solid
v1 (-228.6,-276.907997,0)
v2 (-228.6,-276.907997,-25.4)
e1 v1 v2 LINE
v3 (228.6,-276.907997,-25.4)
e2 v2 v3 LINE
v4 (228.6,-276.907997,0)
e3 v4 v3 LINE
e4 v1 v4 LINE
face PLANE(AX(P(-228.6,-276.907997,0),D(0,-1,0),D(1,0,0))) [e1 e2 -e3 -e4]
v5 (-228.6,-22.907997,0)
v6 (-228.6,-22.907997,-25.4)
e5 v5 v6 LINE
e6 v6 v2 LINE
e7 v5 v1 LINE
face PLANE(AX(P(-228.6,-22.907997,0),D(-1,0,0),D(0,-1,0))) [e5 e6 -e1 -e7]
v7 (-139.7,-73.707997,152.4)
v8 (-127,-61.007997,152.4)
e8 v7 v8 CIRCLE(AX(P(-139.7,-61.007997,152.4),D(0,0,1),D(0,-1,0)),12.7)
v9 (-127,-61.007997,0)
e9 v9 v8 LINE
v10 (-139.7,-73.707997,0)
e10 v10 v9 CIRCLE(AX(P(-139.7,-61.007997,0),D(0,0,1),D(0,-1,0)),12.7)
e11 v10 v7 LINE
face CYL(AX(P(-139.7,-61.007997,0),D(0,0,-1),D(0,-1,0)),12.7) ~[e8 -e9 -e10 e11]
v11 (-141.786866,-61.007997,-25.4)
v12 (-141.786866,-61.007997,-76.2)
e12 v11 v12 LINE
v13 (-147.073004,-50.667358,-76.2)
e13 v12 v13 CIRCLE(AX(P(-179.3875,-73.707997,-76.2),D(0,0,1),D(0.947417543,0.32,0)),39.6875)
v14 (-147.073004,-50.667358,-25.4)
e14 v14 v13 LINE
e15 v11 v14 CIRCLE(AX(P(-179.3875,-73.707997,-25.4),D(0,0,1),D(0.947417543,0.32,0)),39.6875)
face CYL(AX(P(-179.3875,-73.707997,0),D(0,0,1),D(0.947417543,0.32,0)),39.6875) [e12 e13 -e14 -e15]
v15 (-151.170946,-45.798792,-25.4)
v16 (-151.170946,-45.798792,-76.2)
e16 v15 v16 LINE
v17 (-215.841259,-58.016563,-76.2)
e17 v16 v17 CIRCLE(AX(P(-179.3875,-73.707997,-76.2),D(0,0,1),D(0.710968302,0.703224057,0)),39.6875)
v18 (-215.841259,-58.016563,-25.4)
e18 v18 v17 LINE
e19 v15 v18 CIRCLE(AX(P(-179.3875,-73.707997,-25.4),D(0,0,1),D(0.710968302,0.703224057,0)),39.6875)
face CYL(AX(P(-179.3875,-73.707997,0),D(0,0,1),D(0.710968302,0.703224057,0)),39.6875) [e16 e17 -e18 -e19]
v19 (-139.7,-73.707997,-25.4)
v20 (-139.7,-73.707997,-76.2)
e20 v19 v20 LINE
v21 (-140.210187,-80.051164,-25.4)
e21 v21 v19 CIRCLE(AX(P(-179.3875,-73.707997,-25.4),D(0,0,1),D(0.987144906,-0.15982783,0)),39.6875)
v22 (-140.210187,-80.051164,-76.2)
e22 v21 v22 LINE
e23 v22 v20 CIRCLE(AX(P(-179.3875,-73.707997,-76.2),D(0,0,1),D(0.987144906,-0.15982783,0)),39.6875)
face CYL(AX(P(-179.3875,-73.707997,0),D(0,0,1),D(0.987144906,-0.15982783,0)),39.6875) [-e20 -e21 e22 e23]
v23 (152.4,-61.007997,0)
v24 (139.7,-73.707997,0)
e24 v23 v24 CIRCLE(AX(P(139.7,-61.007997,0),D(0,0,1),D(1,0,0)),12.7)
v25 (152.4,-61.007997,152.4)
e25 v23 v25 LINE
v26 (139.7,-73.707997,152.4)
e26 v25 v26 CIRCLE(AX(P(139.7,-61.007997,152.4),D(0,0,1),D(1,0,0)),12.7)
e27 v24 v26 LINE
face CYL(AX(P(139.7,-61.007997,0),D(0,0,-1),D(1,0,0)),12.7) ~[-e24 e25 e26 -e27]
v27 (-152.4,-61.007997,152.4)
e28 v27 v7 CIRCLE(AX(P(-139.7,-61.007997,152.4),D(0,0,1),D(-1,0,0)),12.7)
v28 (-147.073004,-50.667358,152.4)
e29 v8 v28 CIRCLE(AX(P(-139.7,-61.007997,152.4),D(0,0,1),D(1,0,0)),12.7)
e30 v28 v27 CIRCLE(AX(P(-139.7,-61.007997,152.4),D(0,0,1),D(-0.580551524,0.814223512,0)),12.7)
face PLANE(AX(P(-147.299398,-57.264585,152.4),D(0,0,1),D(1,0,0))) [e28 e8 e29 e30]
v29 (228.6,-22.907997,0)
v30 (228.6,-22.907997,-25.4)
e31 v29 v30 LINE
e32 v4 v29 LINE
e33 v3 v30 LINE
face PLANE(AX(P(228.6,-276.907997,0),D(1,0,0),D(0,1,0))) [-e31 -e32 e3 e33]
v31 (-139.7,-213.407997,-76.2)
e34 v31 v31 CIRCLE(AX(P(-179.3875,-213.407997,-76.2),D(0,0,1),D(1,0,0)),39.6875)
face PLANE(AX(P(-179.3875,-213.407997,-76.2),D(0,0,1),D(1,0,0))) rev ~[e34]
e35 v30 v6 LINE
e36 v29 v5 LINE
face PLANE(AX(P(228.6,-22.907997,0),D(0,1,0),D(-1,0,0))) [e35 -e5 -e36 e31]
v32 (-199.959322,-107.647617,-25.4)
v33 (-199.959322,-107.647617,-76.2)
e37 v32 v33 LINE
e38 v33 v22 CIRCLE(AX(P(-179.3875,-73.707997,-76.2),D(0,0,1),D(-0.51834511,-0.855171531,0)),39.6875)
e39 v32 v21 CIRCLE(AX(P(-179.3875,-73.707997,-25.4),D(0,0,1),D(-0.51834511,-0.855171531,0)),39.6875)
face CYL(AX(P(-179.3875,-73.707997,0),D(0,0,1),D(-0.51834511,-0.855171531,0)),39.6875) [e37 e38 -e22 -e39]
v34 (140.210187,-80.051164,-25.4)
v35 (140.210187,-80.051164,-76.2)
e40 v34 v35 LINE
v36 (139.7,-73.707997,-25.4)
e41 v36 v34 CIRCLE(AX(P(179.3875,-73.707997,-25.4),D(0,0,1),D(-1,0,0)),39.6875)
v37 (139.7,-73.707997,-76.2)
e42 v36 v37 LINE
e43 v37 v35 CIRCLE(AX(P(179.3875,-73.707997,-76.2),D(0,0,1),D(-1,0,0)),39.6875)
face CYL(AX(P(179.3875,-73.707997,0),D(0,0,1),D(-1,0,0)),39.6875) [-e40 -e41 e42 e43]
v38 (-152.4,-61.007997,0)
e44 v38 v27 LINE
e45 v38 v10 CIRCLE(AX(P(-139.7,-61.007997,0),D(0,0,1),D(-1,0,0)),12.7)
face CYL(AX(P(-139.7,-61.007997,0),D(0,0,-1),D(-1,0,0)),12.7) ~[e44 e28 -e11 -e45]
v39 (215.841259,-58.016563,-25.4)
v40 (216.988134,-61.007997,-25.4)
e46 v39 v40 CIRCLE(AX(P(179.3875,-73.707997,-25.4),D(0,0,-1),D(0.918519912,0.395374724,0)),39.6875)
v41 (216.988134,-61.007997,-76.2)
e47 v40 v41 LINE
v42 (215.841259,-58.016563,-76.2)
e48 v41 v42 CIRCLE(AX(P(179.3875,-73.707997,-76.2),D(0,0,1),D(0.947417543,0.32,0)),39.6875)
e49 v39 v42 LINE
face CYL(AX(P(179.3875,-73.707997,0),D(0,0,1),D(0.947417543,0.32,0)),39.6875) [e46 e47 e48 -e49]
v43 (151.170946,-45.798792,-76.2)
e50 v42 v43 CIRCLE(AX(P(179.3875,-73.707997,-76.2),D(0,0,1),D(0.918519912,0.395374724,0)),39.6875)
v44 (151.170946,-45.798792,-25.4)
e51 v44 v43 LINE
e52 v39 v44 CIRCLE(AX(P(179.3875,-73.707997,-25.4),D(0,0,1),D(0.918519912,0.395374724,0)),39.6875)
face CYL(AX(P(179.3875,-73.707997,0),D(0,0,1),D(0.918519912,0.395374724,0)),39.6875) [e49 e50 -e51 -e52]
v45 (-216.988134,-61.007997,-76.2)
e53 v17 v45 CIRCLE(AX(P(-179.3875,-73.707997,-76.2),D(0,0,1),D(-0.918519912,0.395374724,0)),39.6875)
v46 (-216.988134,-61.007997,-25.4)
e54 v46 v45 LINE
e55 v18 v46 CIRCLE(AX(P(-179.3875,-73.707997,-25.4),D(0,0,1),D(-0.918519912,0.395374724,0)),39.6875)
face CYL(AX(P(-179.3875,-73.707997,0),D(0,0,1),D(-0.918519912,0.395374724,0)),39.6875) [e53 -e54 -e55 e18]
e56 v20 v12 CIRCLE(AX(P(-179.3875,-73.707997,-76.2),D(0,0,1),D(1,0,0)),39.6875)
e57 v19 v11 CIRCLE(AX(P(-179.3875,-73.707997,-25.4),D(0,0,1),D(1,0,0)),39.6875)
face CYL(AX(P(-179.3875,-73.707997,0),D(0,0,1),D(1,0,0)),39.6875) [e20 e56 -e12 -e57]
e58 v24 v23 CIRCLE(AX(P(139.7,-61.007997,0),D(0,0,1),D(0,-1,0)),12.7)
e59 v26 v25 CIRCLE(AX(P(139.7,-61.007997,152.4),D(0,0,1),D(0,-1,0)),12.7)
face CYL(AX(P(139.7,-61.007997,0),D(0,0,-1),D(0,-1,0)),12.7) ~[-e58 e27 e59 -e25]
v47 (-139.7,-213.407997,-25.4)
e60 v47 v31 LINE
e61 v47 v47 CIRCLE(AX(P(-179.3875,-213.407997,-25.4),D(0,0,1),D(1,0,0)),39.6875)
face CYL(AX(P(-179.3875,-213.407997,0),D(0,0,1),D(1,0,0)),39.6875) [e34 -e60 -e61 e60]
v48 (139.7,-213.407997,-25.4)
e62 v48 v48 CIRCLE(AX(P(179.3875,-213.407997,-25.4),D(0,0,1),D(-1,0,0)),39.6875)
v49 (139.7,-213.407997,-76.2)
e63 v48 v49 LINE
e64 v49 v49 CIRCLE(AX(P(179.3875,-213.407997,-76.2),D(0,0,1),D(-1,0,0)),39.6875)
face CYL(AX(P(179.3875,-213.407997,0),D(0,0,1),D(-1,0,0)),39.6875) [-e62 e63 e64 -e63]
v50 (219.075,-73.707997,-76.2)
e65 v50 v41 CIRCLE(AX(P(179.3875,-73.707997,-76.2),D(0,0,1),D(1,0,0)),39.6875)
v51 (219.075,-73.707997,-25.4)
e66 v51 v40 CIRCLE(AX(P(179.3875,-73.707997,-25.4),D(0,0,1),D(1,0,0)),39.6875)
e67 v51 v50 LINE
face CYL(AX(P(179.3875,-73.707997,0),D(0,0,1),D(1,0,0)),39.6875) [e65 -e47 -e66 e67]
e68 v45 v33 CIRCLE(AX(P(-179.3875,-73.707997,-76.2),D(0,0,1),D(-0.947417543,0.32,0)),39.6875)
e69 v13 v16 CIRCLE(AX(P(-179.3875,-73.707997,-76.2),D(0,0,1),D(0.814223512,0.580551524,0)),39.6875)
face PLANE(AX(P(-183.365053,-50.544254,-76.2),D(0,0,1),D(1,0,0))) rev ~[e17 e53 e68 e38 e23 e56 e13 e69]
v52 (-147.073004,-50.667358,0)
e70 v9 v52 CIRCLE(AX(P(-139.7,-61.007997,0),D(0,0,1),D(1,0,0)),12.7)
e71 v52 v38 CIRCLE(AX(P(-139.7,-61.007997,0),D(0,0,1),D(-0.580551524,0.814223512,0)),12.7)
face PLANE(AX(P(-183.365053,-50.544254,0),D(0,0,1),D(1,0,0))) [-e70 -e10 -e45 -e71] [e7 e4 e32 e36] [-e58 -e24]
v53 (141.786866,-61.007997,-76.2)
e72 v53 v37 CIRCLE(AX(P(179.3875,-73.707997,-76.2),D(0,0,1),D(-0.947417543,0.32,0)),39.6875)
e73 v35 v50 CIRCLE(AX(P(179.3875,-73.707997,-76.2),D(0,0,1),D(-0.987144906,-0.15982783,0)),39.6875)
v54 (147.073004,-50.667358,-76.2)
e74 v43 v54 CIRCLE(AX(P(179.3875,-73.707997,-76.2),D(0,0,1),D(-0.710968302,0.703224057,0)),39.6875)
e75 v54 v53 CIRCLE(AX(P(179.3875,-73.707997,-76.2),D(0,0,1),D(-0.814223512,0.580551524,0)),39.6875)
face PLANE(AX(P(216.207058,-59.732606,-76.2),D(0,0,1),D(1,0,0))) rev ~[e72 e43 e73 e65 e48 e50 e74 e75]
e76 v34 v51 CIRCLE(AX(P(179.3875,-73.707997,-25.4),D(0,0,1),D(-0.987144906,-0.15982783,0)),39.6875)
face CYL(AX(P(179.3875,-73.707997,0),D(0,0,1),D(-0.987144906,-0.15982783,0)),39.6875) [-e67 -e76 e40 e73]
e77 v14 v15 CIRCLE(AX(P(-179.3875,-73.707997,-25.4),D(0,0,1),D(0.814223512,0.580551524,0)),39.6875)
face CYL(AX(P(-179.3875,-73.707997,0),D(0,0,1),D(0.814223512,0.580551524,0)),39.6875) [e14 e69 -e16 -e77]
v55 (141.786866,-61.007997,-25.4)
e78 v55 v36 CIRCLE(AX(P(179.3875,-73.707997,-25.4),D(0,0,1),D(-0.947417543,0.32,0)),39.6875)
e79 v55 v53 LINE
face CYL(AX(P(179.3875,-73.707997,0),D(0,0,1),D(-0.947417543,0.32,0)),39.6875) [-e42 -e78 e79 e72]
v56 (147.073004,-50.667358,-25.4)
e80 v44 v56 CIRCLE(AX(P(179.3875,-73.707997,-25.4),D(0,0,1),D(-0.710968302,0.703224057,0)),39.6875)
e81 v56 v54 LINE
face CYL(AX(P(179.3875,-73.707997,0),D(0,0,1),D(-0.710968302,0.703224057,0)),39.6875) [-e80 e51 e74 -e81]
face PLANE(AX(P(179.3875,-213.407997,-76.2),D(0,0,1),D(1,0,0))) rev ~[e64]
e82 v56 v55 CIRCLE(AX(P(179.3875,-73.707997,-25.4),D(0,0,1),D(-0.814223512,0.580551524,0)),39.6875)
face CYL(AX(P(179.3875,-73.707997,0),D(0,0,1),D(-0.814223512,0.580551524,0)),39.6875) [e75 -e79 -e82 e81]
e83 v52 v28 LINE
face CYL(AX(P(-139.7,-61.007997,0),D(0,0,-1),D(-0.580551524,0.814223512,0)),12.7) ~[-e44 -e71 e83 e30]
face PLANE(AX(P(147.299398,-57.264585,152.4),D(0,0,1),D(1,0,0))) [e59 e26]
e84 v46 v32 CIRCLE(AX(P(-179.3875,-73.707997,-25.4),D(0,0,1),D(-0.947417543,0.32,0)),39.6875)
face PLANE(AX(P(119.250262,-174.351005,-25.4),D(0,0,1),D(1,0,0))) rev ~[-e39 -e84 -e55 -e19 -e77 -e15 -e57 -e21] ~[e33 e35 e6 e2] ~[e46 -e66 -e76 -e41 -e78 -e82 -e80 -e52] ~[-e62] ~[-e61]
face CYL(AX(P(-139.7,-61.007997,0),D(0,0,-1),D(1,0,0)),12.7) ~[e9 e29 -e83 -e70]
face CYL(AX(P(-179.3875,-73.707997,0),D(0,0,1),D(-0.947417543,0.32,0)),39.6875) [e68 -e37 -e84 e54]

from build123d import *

# Parameters (mm, degrees)
F0_R     = 39.6875
F1_DEPTH = 25.4
F2_DEPTH = 76.2
F3_DEPTH = 152.4


with BuildPart() as f1:
    # F0 (on Top) → F1 (new body)
    with BuildSketch(Plane.XY):
        with BuildLine():
            Line((64.5657867546, -73.7079969396), (0, -73.7079969396))
            Line((0, -73.7079969396), (0, -213.4079969396))
            Line((0, -213.4079969396), (0, -276.9079969396))
            Line((0, -276.9079969396), (228.6, -276.9079969396))
            Line((228.6, -276.9079969396), (228.6, -61.0079969396))
            Line((228.6, -61.0079969396), (216.9881337214, -61.0079969396))
            ThreePointArc((216.9881337214, -61.0079969396), (218.5498084551, -67.2728393878), (219.075, -73.7079969396))
            ThreePointArc((219.075, -73.7079969396), (213.9674206511, -93.1843093218), (199.9593215616, -107.6476170595))
            ThreePointArc((199.9593215616, -107.6476170595), (121.1719117521, -134.9211212537), (64.5657867546, -73.7079969396))
        make_face()
        with BuildLine():
            ThreePointArc((219.075, -213.4079969396), (179.3875, -253.0954969396), (139.7, -213.4079969396))
            ThreePointArc((139.7, -213.4079969396), (179.3875, -173.7204969396), (219.075, -213.4079969396))
        make_face(mode=Mode.SUBTRACT)
        with BuildLine():
            Line((0, -213.4079969396), (0, -73.7079969396))
            Line((0, -73.7079969396), (-64.5657867546, -73.7079969396))
            ThreePointArc((-64.5657867546, -73.7079969396), (-121.1719117521, -134.9211212537), (-199.9593215616, -107.6476170595))
            ThreePointArc((-199.9593215616, -107.6476170595), (-216.6678189317, -87.3195904026), (-216.9881337214, -61.0079969396))
            Line((-216.9881337214, -61.0079969396), (-228.6, -61.0079969396))
            Line((-228.6, -61.0079969396), (-228.6, -276.9079969396))
            Line((-228.6, -276.9079969396), (0, -276.9079969396))
            Line((0, -276.9079969396), (0, -213.4079969396))
        make_face()
        with Locations((-179.3875, -213.4079969396)):
            Circle(F0_R, mode=Mode.SUBTRACT)
        with BuildLine():
            ThreePointArc((219.075, -213.4079969396), (179.3875, -173.7204969396), (139.7, -213.4079969396))
            ThreePointArc((139.7, -213.4079969396), (179.3875, -253.0954969396), (219.075, -213.4079969396))
        make_face()
        with Locations((-179.3875, -213.4079969396)):
            Circle(F0_R)
        with BuildLine():
            ThreePointArc((-199.9593215616, -107.6476170595), (-121.1719117521, -134.9211212537), (-64.5657867546, -73.7079969396))
            Line((-64.5657867546, -73.7079969396), (-125.5009683429, -73.7079969396))
            ThreePointArc((-125.5009683429, -73.7079969396), (-132.1564556102, -78.5007793952), (-140.2101865576, -80.0511639471))
            ThreePointArc((-140.2101865576, -80.0511639471), (-162.7462218601, -109.7380610267), (-199.9593215616, -107.6476170595))
        make_face()
        with BuildLine():
            Line((125.5009683429, -73.7079969396), (64.5657867546, -73.7079969396))
            ThreePointArc((64.5657867546, -73.7079969396), (121.1719117521, -134.9211212537), (199.9593215616, -107.6476170595))
            ThreePointArc((199.9593215616, -107.6476170595), (162.7462218601, -109.7380610267), (140.2101865576, -80.0511639471))
            ThreePointArc((140.2101865576, -80.0511639471), (132.1564556102, -78.5007793952), (125.5009683429, -73.7079969396))
        make_face()
        with BuildLine():
            Line((-158.75, -61.0079969396), (-215.9, -61.0079969396))
            ThreePointArc((-215.9, -61.0079969396), (-211.8047859126, -85.6522629766), (-199.9593215616, -107.6476170595))
            ThreePointArc((-199.9593215616, -107.6476170595), (-162.7462218601, -109.7380610267), (-140.2101865576, -80.0511639471))
            ThreePointArc((-140.2101865576, -80.0511639471), (-147.7093206356, -78.2924779256), (-153.8990316571, -73.7079969396))
            ThreePointArc((-153.8990316571, -73.7079969396), (-157.4959834382, -67.8054577497), (-158.75, -61.0079969396))
        make_face()
        with BuildLine():
            ThreePointArc((199.9593215616, -107.6476170595), (211.8047859126, -85.6522629766), (215.9, -61.0079969396))
            Line((215.9, -61.0079969396), (158.75, -61.0079969396))
            ThreePointArc((158.75, -61.0079969396), (157.4959834382, -67.8054577497), (153.8990316571, -73.7079969396))
            ThreePointArc((153.8990316571, -73.7079969396), (147.7093206356, -78.2924779256), (140.2101865576, -80.0511639471))
            ThreePointArc((140.2101865576, -80.0511639471), (162.7462218601, -109.7380610267), (199.9593215616, -107.6476170595))
        make_face()
        with BuildLine():
            ThreePointArc((-64.2559890942, -50.3009329885), (-67.668281882, -36.1509740894), (-73.7088642316, -22.9079969396))
            Line((-73.7088642316, -22.9079969396), (-205.6911357684, -22.9079969396))
            ThreePointArc((-205.6911357684, -22.9079969396), (-212.902167014, -39.8447565342), (-215.8412589899, -58.0165625961))
            ThreePointArc((-215.8412589899, -58.0165625961), (-186.7550886769, -34.7103522243), (-151.1709455179, -45.7987921962))
            ThreePointArc((-151.1709455179, -45.7987921962), (-144.730628113, -42.6342308371), (-137.5765162555, -42.0767181453))
            Line((-137.5765162555, -42.0767181453), (-64.2559890942, -50.3009329885))
        make_face()
        with BuildLine():
            Line((205.6911357684, -22.9079969396), (73.7088642316, -22.9079969396))
            ThreePointArc((73.7088642316, -22.9079969396), (67.668281882, -36.1509740894), (64.2559890942, -50.3009329885))
            Line((64.2559890942, -50.3009329885), (137.5765161823, -42.0767181535))
            ThreePointArc((137.5765161823, -42.0767181535), (144.7306280775, -42.6342308273), (151.1709455179, -45.7987921962))
            ThreePointArc((151.1709455179, -45.7987921962), (186.7550886769, -34.7103522243), (215.8412589899, -58.0165625961))
            ThreePointArc((215.8412589899, -58.0165625961), (212.902167014, -39.8447565342), (205.6911357684, -22.9079969396))
        make_face()
        with BuildLine():
            Line((0, -22.9079969396), (-73.7088642316, -22.9079969396))
            ThreePointArc((-73.7088642316, -22.9079969396), (-67.668281882, -36.1509740894), (-64.2559890942, -50.3009329885))
            Line((-64.2559890942, -50.3009329885), (0, -57.5083969789))
            Line((0, -57.5083969789), (0, -22.9079969396))
        make_face()
        with BuildLine():
            Line((73.7088642316, -22.9079969396), (0, -22.9079969396))
            Line((0, -22.9079969396), (0, -57.5083969789))
            Line((0, -57.5083969789), (64.2559890942, -50.3009329885))
            ThreePointArc((64.2559890942, -50.3009329885), (67.668281882, -36.1509740894), (73.7088642316, -22.9079969396))
        make_face()
        with BuildLine():
            ThreePointArc((-63.5, -61.0079969396), (-63.6892322397, -55.6411371043), (-64.2559890942, -50.3009329885))
            Line((-64.2559890942, -50.3009329885), (-137.5765162555, -42.0767181453))
            ThreePointArc((-137.5765162555, -42.0767181453), (-125.4986820095, -48.3105536011), (-120.65, -61.0079969396))
            ThreePointArc((-120.65, -61.0079969396), (-121.9040165618, -67.8054577497), (-125.5009683429, -73.7079969396))
            Line((-125.5009683429, -73.7079969396), (-64.5657867546, -73.7079969396))
            ThreePointArc((-64.5657867546, -73.7079969396), (-63.7669141635, -67.3803179729), (-63.5, -61.0079969396))
        make_face()
        with BuildLine():
            Line((137.5765161823, -42.0767181535), (64.2559890942, -50.3009329885))
            ThreePointArc((64.2559890942, -50.3009329885), (63.5066731411, -62.0164324464), (64.5657867546, -73.7079969396))
            Line((64.5657867546, -73.7079969396), (125.5009683429, -73.7079969396))
            ThreePointArc((125.5009683429, -73.7079969396), (121.9027929925, -54.2137403406), (137.5765161823, -42.0767181535))
        make_face()
        with BuildLine():
            ThreePointArc((-151.1709455179, -45.7987921962), (-186.7550886769, -34.7103522243), (-215.8412589899, -58.0165625961))
            ThreePointArc((-215.8412589899, -58.0165625961), (-215.8853133321, -59.5119914301), (-215.9, -61.0079969396))
            Line((-215.9, -61.0079969396), (-158.75, -61.0079969396))
            ThreePointArc((-158.75, -61.0079969396), (-156.7502787677, -52.5114980169), (-151.1709455179, -45.7987921962))
        make_face()
        with BuildLine():
            ThreePointArc((215.9, -61.0079969396), (215.8853133321, -59.5119914301), (215.8412589899, -58.0165625961))
            ThreePointArc((215.8412589899, -58.0165625961), (186.7550886769, -34.7103522243), (151.1709455179, -45.7987921962))
            ThreePointArc((151.1709455179, -45.7987921962), (156.7502787677, -52.5114980169), (158.75, -61.0079969396))
            Line((158.75, -61.0079969396), (215.9, -61.0079969396))
        make_face()
        with BuildLine():
            Line((0, -57.5083969789), (-64.2559890942, -50.3009329885))
            ThreePointArc((-64.2559890942, -50.3009329885), (-63.6892322397, -55.6411371043), (-63.5, -61.0079969396))
            ThreePointArc((-63.5, -61.0079969396), (-63.7669141635, -67.3803179729), (-64.5657867546, -73.7079969396))
            Line((-64.5657867546, -73.7079969396), (0, -73.7079969396))
            Line((0, -73.7079969396), (0, -57.5083969789))
        make_face()
        with BuildLine():
            Line((64.2559890942, -50.3009329885), (0, -57.5083969789))
            Line((0, -57.5083969789), (0, -73.7079969396))
            Line((0, -73.7079969396), (64.5657867546, -73.7079969396))
            ThreePointArc((64.5657867546, -73.7079969396), (63.5066731411, -62.0164324464), (64.2559890942, -50.3009329885))
        make_face()
        with BuildLine():
            ThreePointArc((-215.8412589899, -58.0165625961), (-212.902167014, -39.8447565342), (-205.6911357684, -22.9079969396))
            Line((-205.6911357684, -22.9079969396), (-228.6, -22.9079969396))
            Line((-228.6, -22.9079969396), (-228.6, -61.0079969396))
            Line((-228.6, -61.0079969396), (-216.9881337214, -61.0079969396))
            ThreePointArc((-216.9881337214, -61.0079969396), (-216.4448938617, -59.5007024599), (-215.8412589899, -58.0165625961))
        make_face()
        with BuildLine():
            Line((228.6, -22.9079969396), (205.6911357684, -22.9079969396))
            ThreePointArc((205.6911357684, -22.9079969396), (212.902167014, -39.8447565342), (215.8412589899, -58.0165625961))
            ThreePointArc((215.8412589899, -58.0165625961), (216.4448938617, -59.5007024599), (216.9881337214, -61.0079969396))
            Line((216.9881337214, -61.0079969396), (228.6, -61.0079969396))
            Line((228.6, -61.0079969396), (228.6, -22.9079969396))
        make_face()
        with BuildLine():
            ThreePointArc((-127, -61.0079969396), (-133.8839513111, -49.7180200729), (-147.0730043541, -50.6673583329))
            ThreePointArc((-147.0730043541, -50.6673583329), (-144.0496515891, -55.6432764617), (-141.7868662786, -61.0079969396))
            ThreePointArc((-141.7868662786, -61.0079969396), (-140.2251915449, -67.2728393878), (-139.7, -73.7079969396))
            ThreePointArc((-139.7, -73.7079969396), (-130.7197438789, -69.9882530606), (-127, -61.0079969396))
        make_face()
        with BuildLine():
            ThreePointArc((141.7868662786, -61.0079969396), (144.0496515891, -55.6432764617), (147.0730043541, -50.6673583329))
            ThreePointArc((147.0730043541, -50.6673583329), (127.6042133306, -57.1373452053), (139.7, -73.7079969396))
            ThreePointArc((139.7, -73.7079969396), (140.2251915449, -67.2728393878), (141.7868662786, -61.0079969396))
        make_face()
        with BuildLine():
            ThreePointArc((-120.65, -61.0079969396), (-125.4986820095, -48.3105536011), (-137.5765162555, -42.0767181453))
            ThreePointArc((-137.5765162555, -42.0767181453), (-144.730628113, -42.6342308371), (-151.1709455179, -45.7987921962))
            ThreePointArc((-151.1709455179, -45.7987921962), (-149.0242369761, -48.1508078376), (-147.0730043541, -50.6673583329))
            ThreePointArc((-147.0730043541, -50.6673583329), (-133.8839513111, -49.7180200729), (-127, -61.0079969396))
            ThreePointArc((-127, -61.0079969396), (-130.7197438789, -69.9882530606), (-139.7, -73.7079969396))
            Line((-139.7, -73.7079969396), (-125.5009683429, -73.7079969396))
            ThreePointArc((-125.5009683429, -73.7079969396), (-121.9040165618, -67.8054577497), (-120.65, -61.0079969396))
        make_face()
        with BuildLine():
            ThreePointArc((151.1709455179, -45.7987921962), (144.7306280775, -42.6342308273), (137.5765161823, -42.0767181535))
            ThreePointArc((137.5765161823, -42.0767181535), (121.9027929925, -54.2137403406), (125.5009683429, -73.7079969396))
            Line((125.5009683429, -73.7079969396), (139.7, -73.7079969396))
            ThreePointArc((139.7, -73.7079969396), (127.6042133306, -57.1373452053), (147.0730043541, -50.6673583329))
            ThreePointArc((147.0730043541, -50.6673583329), (149.0242369761, -48.1508078376), (151.1709455179, -45.7987921962))
        make_face()
        with BuildLine():
            ThreePointArc((-199.9593215616, -107.6476170595), (-211.8047859126, -85.6522629766), (-215.9, -61.0079969396))
            Line((-215.9, -61.0079969396), (-216.9881337214, -61.0079969396))
            ThreePointArc((-216.9881337214, -61.0079969396), (-216.6678189317, -87.3195904026), (-199.9593215616, -107.6476170595))
        make_face()
        with BuildLine():
            Line((216.9881337214, -61.0079969396), (215.9, -61.0079969396))
            ThreePointArc((215.9, -61.0079969396), (211.8047859126, -85.6522629766), (199.9593215616, -107.6476170595))
            ThreePointArc((199.9593215616, -107.6476170595), (213.9674206511, -93.1843093218), (219.075, -73.7079969396))
            ThreePointArc((219.075, -73.7079969396), (218.5498084551, -67.2728393878), (216.9881337214, -61.0079969396))
        make_face()
        with BuildLine():
            ThreePointArc((-152.4, -61.0079969396), (-148.6802561211, -69.9882530606), (-139.7, -73.7079969396))
            ThreePointArc((-139.7, -73.7079969396), (-140.2251915449, -67.2728393878), (-141.7868662786, -61.0079969396))
            Line((-141.7868662786, -61.0079969396), (-152.4, -61.0079969396))
        make_face()
        with BuildLine():
            ThreePointArc((141.7868662786, -61.0079969396), (140.2251915449, -67.2728393878), (139.7, -73.7079969396))
            ThreePointArc((139.7, -73.7079969396), (148.6802561211, -69.9882530606), (152.4, -61.0079969396))
            Line((152.4, -61.0079969396), (141.7868662786, -61.0079969396))
        make_face()
        with BuildLine():
            Line((-152.4, -61.0079969396), (-158.75, -61.0079969396))
            ThreePointArc((-158.75, -61.0079969396), (-157.4959834382, -67.8054577497), (-153.8990316571, -73.7079969396))
            Line((-153.8990316571, -73.7079969396), (-139.7, -73.7079969396))
            ThreePointArc((-139.7, -73.7079969396), (-148.6802561211, -69.9882530606), (-152.4, -61.0079969396))
        make_face()
        with BuildLine():
            ThreePointArc((153.8990316571, -73.7079969396), (157.4959834382, -67.8054577497), (158.75, -61.0079969396))
            Line((158.75, -61.0079969396), (152.4, -61.0079969396))
            ThreePointArc((152.4, -61.0079969396), (148.6802561211, -69.9882530606), (139.7, -73.7079969396))
            Line((139.7, -73.7079969396), (153.8990316571, -73.7079969396))
        make_face()
        with BuildLine():
            ThreePointArc((-147.0730043541, -50.6673583329), (-149.0242369761, -48.1508078376), (-151.1709455179, -45.7987921962))
            ThreePointArc((-151.1709455179, -45.7987921962), (-156.7502787677, -52.5114980169), (-158.75, -61.0079969396))
            Line((-158.75, -61.0079969396), (-152.4, -61.0079969396))
            ThreePointArc((-152.4, -61.0079969396), (-150.9899768666, -55.1919482507), (-147.0730043541, -50.6673583329))
        make_face()
        with BuildLine():
            ThreePointArc((158.75, -61.0079969396), (156.7502787677, -52.5114980169), (151.1709455179, -45.7987921962))
            ThreePointArc((151.1709455179, -45.7987921962), (149.0242369761, -48.1508078376), (147.0730043541, -50.6673583329))
            ThreePointArc((147.0730043541, -50.6673583329), (150.9899768666, -55.1919482507), (152.4, -61.0079969396))
            Line((152.4, -61.0079969396), (158.75, -61.0079969396))
        make_face()
        with BuildLine():
            ThreePointArc((-141.7868662786, -61.0079969396), (-144.0496515891, -55.6432764617), (-147.0730043541, -50.6673583329))
            ThreePointArc((-147.0730043541, -50.6673583329), (-150.9899768666, -55.1919482507), (-152.4, -61.0079969396))
            Line((-152.4, -61.0079969396), (-141.7868662786, -61.0079969396))
        make_face()
        with BuildLine():
            ThreePointArc((152.4, -61.0079969396), (150.9899768666, -55.1919482507), (147.0730043541, -50.6673583329))
            ThreePointArc((147.0730043541, -50.6673583329), (144.0496515891, -55.6432764617), (141.7868662786, -61.0079969396))
            Line((141.7868662786, -61.0079969396), (152.4, -61.0079969396))
        make_face()
        with BuildLine():
            ThreePointArc((-140.2101865576, -80.0511639471), (-132.1564556102, -78.5007793952), (-125.5009683429, -73.7079969396))
            Line((-125.5009683429, -73.7079969396), (-139.7, -73.7079969396))
            ThreePointArc((-139.7, -73.7079969396), (-139.8277522537, -76.8898225951), (-140.2101865576, -80.0511639471))
        make_face()
        with BuildLine():
            Line((139.7, -73.7079969396), (125.5009683429, -73.7079969396))
            ThreePointArc((125.5009683429, -73.7079969396), (132.1564556102, -78.5007793952), (140.2101865576, -80.0511639471))
            ThreePointArc((140.2101865576, -80.0511639471), (139.8277522537, -76.8898225951), (139.7, -73.7079969396))
        make_face()
        with BuildLine():
            ThreePointArc((-153.8990316571, -73.7079969396), (-147.7093206356, -78.2924779256), (-140.2101865576, -80.0511639471))
            ThreePointArc((-140.2101865576, -80.0511639471), (-139.8277522537, -76.8898225951), (-139.7, -73.7079969396))
            Line((-139.7, -73.7079969396), (-153.8990316571, -73.7079969396))
        make_face()
        with BuildLine():
            ThreePointArc((139.7, -73.7079969396), (139.8277522537, -76.8898225951), (140.2101865576, -80.0511639471))
            ThreePointArc((140.2101865576, -80.0511639471), (147.7093206356, -78.2924779256), (153.8990316571, -73.7079969396))
            Line((153.8990316571, -73.7079969396), (139.7, -73.7079969396))
        make_face()
        with BuildLine():
            ThreePointArc((-215.9, -61.0079969396), (-215.8853133321, -59.5119914301), (-215.8412589899, -58.0165625961))
            ThreePointArc((-215.8412589899, -58.0165625961), (-216.4448938617, -59.5007024599), (-216.9881337214, -61.0079969396))
            Line((-216.9881337214, -61.0079969396), (-215.9, -61.0079969396))
        make_face()
    extrude(amount=-F1_DEPTH)

    # F0 (on Top) → F2 (join)
    with BuildSketch(Plane.XY):
        with BuildLine():
            ThreePointArc((-151.1709455179, -45.7987921962), (-186.7550886769, -34.7103522243), (-215.8412589899, -58.0165625961))
            ThreePointArc((-215.8412589899, -58.0165625961), (-215.8853133321, -59.5119914301), (-215.9, -61.0079969396))
            Line((-215.9, -61.0079969396), (-158.75, -61.0079969396))
            ThreePointArc((-158.75, -61.0079969396), (-156.7502787677, -52.5114980169), (-151.1709455179, -45.7987921962))
        make_face()
        with BuildLine():
            ThreePointArc((-215.9, -61.0079969396), (-215.8853133321, -59.5119914301), (-215.8412589899, -58.0165625961))
            ThreePointArc((-215.8412589899, -58.0165625961), (-216.4448938617, -59.5007024599), (-216.9881337214, -61.0079969396))
            Line((-216.9881337214, -61.0079969396), (-215.9, -61.0079969396))
        make_face()
        with BuildLine():
            ThreePointArc((219.075, -213.4079969396), (179.3875, -173.7204969396), (139.7, -213.4079969396))
            ThreePointArc((139.7, -213.4079969396), (179.3875, -253.0954969396), (219.075, -213.4079969396))
        make_face()
        with Locations((-179.3875, -213.4079969396)):
            Circle(F0_R)
        with BuildLine():
            ThreePointArc((-147.0730043541, -50.6673583329), (-149.0242369761, -48.1508078376), (-151.1709455179, -45.7987921962))
            ThreePointArc((-151.1709455179, -45.7987921962), (-156.7502787677, -52.5114980169), (-158.75, -61.0079969396))
            Line((-158.75, -61.0079969396), (-152.4, -61.0079969396))
            ThreePointArc((-152.4, -61.0079969396), (-150.9899768666, -55.1919482507), (-147.0730043541, -50.6673583329))
        make_face()
        with BuildLine():
            Line((-158.75, -61.0079969396), (-215.9, -61.0079969396))
            ThreePointArc((-215.9, -61.0079969396), (-211.8047859126, -85.6522629766), (-199.9593215616, -107.6476170595))
            ThreePointArc((-199.9593215616, -107.6476170595), (-162.7462218601, -109.7380610267), (-140.2101865576, -80.0511639471))
            ThreePointArc((-140.2101865576, -80.0511639471), (-147.7093206356, -78.2924779256), (-153.8990316571, -73.7079969396))
            ThreePointArc((-153.8990316571, -73.7079969396), (-157.4959834382, -67.8054577497), (-158.75, -61.0079969396))
        make_face()
        with BuildLine():
            ThreePointArc((-199.9593215616, -107.6476170595), (-211.8047859126, -85.6522629766), (-215.9, -61.0079969396))
            Line((-215.9, -61.0079969396), (-216.9881337214, -61.0079969396))
            ThreePointArc((-216.9881337214, -61.0079969396), (-216.6678189317, -87.3195904026), (-199.9593215616, -107.6476170595))
        make_face()
        with BuildLine():
            ThreePointArc((216.9881337214, -61.0079969396), (216.4448938617, -59.5007024599), (215.8412589899, -58.0165625961))
            ThreePointArc((215.8412589899, -58.0165625961), (215.8853133321, -59.5119914301), (215.9, -61.0079969396))
            Line((215.9, -61.0079969396), (216.9881337214, -61.0079969396))
        make_face()
        with BuildLine():
            ThreePointArc((215.9, -61.0079969396), (215.8853133321, -59.5119914301), (215.8412589899, -58.0165625961))
            ThreePointArc((215.8412589899, -58.0165625961), (186.7550886769, -34.7103522243), (151.1709455179, -45.7987921962))
            ThreePointArc((151.1709455179, -45.7987921962), (156.7502787677, -52.5114980169), (158.75, -61.0079969396))
            Line((158.75, -61.0079969396), (215.9, -61.0079969396))
        make_face()
        with BuildLine():
            Line((-152.4, -61.0079969396), (-158.75, -61.0079969396))
            ThreePointArc((-158.75, -61.0079969396), (-157.4959834382, -67.8054577497), (-153.8990316571, -73.7079969396))
            Line((-153.8990316571, -73.7079969396), (-139.7, -73.7079969396))
            ThreePointArc((-139.7, -73.7079969396), (-148.6802561211, -69.9882530606), (-152.4, -61.0079969396))
        make_face()
        with BuildLine():
            ThreePointArc((-141.7868662786, -61.0079969396), (-144.0496515891, -55.6432764617), (-147.0730043541, -50.6673583329))
            ThreePointArc((-147.0730043541, -50.6673583329), (-150.9899768666, -55.1919482507), (-152.4, -61.0079969396))
            Line((-152.4, -61.0079969396), (-141.7868662786, -61.0079969396))
        make_face()
        with BuildLine():
            Line((216.9881337214, -61.0079969396), (215.9, -61.0079969396))
            ThreePointArc((215.9, -61.0079969396), (211.8047859126, -85.6522629766), (199.9593215616, -107.6476170595))
            ThreePointArc((199.9593215616, -107.6476170595), (213.9674206511, -93.1843093218), (219.075, -73.7079969396))
            ThreePointArc((219.075, -73.7079969396), (218.5498084551, -67.2728393878), (216.9881337214, -61.0079969396))
        make_face()
        with BuildLine():
            ThreePointArc((199.9593215616, -107.6476170595), (211.8047859126, -85.6522629766), (215.9, -61.0079969396))
            Line((215.9, -61.0079969396), (158.75, -61.0079969396))
            ThreePointArc((158.75, -61.0079969396), (157.4959834382, -67.8054577497), (153.8990316571, -73.7079969396))
            ThreePointArc((153.8990316571, -73.7079969396), (147.7093206356, -78.2924779256), (140.2101865576, -80.0511639471))
            ThreePointArc((140.2101865576, -80.0511639471), (162.7462218601, -109.7380610267), (199.9593215616, -107.6476170595))
        make_face()
        with BuildLine():
            ThreePointArc((158.75, -61.0079969396), (156.7502787677, -52.5114980169), (151.1709455179, -45.7987921962))
            ThreePointArc((151.1709455179, -45.7987921962), (149.0242369761, -48.1508078376), (147.0730043541, -50.6673583329))
            ThreePointArc((147.0730043541, -50.6673583329), (150.9899768666, -55.1919482507), (152.4, -61.0079969396))
            Line((152.4, -61.0079969396), (158.75, -61.0079969396))
        make_face()
        with BuildLine():
            ThreePointArc((-153.8990316571, -73.7079969396), (-147.7093206356, -78.2924779256), (-140.2101865576, -80.0511639471))
            ThreePointArc((-140.2101865576, -80.0511639471), (-139.8277522537, -76.8898225951), (-139.7, -73.7079969396))
            Line((-139.7, -73.7079969396), (-153.8990316571, -73.7079969396))
        make_face()
        with BuildLine():
            ThreePointArc((-152.4, -61.0079969396), (-148.6802561211, -69.9882530606), (-139.7, -73.7079969396))
            ThreePointArc((-139.7, -73.7079969396), (-140.2251915449, -67.2728393878), (-141.7868662786, -61.0079969396))
            Line((-141.7868662786, -61.0079969396), (-152.4, -61.0079969396))
        make_face()
        with BuildLine():
            ThreePointArc((153.8990316571, -73.7079969396), (157.4959834382, -67.8054577497), (158.75, -61.0079969396))
            Line((158.75, -61.0079969396), (152.4, -61.0079969396))
            ThreePointArc((152.4, -61.0079969396), (148.6802561211, -69.9882530606), (139.7, -73.7079969396))
            Line((139.7, -73.7079969396), (153.8990316571, -73.7079969396))
        make_face()
        with BuildLine():
            ThreePointArc((152.4, -61.0079969396), (150.9899768666, -55.1919482507), (147.0730043541, -50.6673583329))
            ThreePointArc((147.0730043541, -50.6673583329), (144.0496515891, -55.6432764617), (141.7868662786, -61.0079969396))
            Line((141.7868662786, -61.0079969396), (152.4, -61.0079969396))
        make_face()
        with BuildLine():
            ThreePointArc((139.7, -73.7079969396), (139.8277522537, -76.8898225951), (140.2101865576, -80.0511639471))
            ThreePointArc((140.2101865576, -80.0511639471), (147.7093206356, -78.2924779256), (153.8990316571, -73.7079969396))
            Line((153.8990316571, -73.7079969396), (139.7, -73.7079969396))
        make_face()
        with BuildLine():
            ThreePointArc((141.7868662786, -61.0079969396), (140.2251915449, -67.2728393878), (139.7, -73.7079969396))
            ThreePointArc((139.7, -73.7079969396), (148.6802561211, -69.9882530606), (152.4, -61.0079969396))
            Line((152.4, -61.0079969396), (141.7868662786, -61.0079969396))
        make_face()
    extrude(amount=-F2_DEPTH)

    # F0 (on Top) → F3 (join)
    with BuildSketch(Plane.XY):
        with BuildLine():
            ThreePointArc((-141.7868662786, -61.0079969396), (-144.0496515891, -55.6432764617), (-147.0730043541, -50.6673583329))
            ThreePointArc((-147.0730043541, -50.6673583329), (-150.9899768666, -55.1919482507), (-152.4, -61.0079969396))
            Line((-152.4, -61.0079969396), (-141.7868662786, -61.0079969396))
        make_face()
        with BuildLine():
            ThreePointArc((-152.4, -61.0079969396), (-148.6802561211, -69.9882530606), (-139.7, -73.7079969396))
            ThreePointArc((-139.7, -73.7079969396), (-140.2251915449, -67.2728393878), (-141.7868662786, -61.0079969396))
            Line((-141.7868662786, -61.0079969396), (-152.4, -61.0079969396))
        make_face()
        with BuildLine():
            ThreePointArc((-127, -61.0079969396), (-133.8839513111, -49.7180200729), (-147.0730043541, -50.6673583329))
            ThreePointArc((-147.0730043541, -50.6673583329), (-144.0496515891, -55.6432764617), (-141.7868662786, -61.0079969396))
            ThreePointArc((-141.7868662786, -61.0079969396), (-140.2251915449, -67.2728393878), (-139.7, -73.7079969396))
            ThreePointArc((-139.7, -73.7079969396), (-130.7197438789, -69.9882530606), (-127, -61.0079969396))
        make_face()
        with BuildLine():
            ThreePointArc((152.4, -61.0079969396), (150.9899768666, -55.1919482507), (147.0730043541, -50.6673583329))
            ThreePointArc((147.0730043541, -50.6673583329), (144.0496515891, -55.6432764617), (141.7868662786, -61.0079969396))
            Line((141.7868662786, -61.0079969396), (152.4, -61.0079969396))
        make_face()
        with BuildLine():
            ThreePointArc((141.7868662786, -61.0079969396), (144.0496515891, -55.6432764617), (147.0730043541, -50.6673583329))
            ThreePointArc((147.0730043541, -50.6673583329), (127.6042133306, -57.1373452053), (139.7, -73.7079969396))
            ThreePointArc((139.7, -73.7079969396), (140.2251915449, -67.2728393878), (141.7868662786, -61.0079969396))
        make_face()
        with BuildLine():
            ThreePointArc((141.7868662786, -61.0079969396), (140.2251915449, -67.2728393878), (139.7, -73.7079969396))
            ThreePointArc((139.7, -73.7079969396), (148.6802561211, -69.9882530606), (152.4, -61.0079969396))
            Line((152.4, -61.0079969396), (141.7868662786, -61.0079969396))
        make_face()
    extrude(amount=F3_DEPTH)


solid = f1.part
